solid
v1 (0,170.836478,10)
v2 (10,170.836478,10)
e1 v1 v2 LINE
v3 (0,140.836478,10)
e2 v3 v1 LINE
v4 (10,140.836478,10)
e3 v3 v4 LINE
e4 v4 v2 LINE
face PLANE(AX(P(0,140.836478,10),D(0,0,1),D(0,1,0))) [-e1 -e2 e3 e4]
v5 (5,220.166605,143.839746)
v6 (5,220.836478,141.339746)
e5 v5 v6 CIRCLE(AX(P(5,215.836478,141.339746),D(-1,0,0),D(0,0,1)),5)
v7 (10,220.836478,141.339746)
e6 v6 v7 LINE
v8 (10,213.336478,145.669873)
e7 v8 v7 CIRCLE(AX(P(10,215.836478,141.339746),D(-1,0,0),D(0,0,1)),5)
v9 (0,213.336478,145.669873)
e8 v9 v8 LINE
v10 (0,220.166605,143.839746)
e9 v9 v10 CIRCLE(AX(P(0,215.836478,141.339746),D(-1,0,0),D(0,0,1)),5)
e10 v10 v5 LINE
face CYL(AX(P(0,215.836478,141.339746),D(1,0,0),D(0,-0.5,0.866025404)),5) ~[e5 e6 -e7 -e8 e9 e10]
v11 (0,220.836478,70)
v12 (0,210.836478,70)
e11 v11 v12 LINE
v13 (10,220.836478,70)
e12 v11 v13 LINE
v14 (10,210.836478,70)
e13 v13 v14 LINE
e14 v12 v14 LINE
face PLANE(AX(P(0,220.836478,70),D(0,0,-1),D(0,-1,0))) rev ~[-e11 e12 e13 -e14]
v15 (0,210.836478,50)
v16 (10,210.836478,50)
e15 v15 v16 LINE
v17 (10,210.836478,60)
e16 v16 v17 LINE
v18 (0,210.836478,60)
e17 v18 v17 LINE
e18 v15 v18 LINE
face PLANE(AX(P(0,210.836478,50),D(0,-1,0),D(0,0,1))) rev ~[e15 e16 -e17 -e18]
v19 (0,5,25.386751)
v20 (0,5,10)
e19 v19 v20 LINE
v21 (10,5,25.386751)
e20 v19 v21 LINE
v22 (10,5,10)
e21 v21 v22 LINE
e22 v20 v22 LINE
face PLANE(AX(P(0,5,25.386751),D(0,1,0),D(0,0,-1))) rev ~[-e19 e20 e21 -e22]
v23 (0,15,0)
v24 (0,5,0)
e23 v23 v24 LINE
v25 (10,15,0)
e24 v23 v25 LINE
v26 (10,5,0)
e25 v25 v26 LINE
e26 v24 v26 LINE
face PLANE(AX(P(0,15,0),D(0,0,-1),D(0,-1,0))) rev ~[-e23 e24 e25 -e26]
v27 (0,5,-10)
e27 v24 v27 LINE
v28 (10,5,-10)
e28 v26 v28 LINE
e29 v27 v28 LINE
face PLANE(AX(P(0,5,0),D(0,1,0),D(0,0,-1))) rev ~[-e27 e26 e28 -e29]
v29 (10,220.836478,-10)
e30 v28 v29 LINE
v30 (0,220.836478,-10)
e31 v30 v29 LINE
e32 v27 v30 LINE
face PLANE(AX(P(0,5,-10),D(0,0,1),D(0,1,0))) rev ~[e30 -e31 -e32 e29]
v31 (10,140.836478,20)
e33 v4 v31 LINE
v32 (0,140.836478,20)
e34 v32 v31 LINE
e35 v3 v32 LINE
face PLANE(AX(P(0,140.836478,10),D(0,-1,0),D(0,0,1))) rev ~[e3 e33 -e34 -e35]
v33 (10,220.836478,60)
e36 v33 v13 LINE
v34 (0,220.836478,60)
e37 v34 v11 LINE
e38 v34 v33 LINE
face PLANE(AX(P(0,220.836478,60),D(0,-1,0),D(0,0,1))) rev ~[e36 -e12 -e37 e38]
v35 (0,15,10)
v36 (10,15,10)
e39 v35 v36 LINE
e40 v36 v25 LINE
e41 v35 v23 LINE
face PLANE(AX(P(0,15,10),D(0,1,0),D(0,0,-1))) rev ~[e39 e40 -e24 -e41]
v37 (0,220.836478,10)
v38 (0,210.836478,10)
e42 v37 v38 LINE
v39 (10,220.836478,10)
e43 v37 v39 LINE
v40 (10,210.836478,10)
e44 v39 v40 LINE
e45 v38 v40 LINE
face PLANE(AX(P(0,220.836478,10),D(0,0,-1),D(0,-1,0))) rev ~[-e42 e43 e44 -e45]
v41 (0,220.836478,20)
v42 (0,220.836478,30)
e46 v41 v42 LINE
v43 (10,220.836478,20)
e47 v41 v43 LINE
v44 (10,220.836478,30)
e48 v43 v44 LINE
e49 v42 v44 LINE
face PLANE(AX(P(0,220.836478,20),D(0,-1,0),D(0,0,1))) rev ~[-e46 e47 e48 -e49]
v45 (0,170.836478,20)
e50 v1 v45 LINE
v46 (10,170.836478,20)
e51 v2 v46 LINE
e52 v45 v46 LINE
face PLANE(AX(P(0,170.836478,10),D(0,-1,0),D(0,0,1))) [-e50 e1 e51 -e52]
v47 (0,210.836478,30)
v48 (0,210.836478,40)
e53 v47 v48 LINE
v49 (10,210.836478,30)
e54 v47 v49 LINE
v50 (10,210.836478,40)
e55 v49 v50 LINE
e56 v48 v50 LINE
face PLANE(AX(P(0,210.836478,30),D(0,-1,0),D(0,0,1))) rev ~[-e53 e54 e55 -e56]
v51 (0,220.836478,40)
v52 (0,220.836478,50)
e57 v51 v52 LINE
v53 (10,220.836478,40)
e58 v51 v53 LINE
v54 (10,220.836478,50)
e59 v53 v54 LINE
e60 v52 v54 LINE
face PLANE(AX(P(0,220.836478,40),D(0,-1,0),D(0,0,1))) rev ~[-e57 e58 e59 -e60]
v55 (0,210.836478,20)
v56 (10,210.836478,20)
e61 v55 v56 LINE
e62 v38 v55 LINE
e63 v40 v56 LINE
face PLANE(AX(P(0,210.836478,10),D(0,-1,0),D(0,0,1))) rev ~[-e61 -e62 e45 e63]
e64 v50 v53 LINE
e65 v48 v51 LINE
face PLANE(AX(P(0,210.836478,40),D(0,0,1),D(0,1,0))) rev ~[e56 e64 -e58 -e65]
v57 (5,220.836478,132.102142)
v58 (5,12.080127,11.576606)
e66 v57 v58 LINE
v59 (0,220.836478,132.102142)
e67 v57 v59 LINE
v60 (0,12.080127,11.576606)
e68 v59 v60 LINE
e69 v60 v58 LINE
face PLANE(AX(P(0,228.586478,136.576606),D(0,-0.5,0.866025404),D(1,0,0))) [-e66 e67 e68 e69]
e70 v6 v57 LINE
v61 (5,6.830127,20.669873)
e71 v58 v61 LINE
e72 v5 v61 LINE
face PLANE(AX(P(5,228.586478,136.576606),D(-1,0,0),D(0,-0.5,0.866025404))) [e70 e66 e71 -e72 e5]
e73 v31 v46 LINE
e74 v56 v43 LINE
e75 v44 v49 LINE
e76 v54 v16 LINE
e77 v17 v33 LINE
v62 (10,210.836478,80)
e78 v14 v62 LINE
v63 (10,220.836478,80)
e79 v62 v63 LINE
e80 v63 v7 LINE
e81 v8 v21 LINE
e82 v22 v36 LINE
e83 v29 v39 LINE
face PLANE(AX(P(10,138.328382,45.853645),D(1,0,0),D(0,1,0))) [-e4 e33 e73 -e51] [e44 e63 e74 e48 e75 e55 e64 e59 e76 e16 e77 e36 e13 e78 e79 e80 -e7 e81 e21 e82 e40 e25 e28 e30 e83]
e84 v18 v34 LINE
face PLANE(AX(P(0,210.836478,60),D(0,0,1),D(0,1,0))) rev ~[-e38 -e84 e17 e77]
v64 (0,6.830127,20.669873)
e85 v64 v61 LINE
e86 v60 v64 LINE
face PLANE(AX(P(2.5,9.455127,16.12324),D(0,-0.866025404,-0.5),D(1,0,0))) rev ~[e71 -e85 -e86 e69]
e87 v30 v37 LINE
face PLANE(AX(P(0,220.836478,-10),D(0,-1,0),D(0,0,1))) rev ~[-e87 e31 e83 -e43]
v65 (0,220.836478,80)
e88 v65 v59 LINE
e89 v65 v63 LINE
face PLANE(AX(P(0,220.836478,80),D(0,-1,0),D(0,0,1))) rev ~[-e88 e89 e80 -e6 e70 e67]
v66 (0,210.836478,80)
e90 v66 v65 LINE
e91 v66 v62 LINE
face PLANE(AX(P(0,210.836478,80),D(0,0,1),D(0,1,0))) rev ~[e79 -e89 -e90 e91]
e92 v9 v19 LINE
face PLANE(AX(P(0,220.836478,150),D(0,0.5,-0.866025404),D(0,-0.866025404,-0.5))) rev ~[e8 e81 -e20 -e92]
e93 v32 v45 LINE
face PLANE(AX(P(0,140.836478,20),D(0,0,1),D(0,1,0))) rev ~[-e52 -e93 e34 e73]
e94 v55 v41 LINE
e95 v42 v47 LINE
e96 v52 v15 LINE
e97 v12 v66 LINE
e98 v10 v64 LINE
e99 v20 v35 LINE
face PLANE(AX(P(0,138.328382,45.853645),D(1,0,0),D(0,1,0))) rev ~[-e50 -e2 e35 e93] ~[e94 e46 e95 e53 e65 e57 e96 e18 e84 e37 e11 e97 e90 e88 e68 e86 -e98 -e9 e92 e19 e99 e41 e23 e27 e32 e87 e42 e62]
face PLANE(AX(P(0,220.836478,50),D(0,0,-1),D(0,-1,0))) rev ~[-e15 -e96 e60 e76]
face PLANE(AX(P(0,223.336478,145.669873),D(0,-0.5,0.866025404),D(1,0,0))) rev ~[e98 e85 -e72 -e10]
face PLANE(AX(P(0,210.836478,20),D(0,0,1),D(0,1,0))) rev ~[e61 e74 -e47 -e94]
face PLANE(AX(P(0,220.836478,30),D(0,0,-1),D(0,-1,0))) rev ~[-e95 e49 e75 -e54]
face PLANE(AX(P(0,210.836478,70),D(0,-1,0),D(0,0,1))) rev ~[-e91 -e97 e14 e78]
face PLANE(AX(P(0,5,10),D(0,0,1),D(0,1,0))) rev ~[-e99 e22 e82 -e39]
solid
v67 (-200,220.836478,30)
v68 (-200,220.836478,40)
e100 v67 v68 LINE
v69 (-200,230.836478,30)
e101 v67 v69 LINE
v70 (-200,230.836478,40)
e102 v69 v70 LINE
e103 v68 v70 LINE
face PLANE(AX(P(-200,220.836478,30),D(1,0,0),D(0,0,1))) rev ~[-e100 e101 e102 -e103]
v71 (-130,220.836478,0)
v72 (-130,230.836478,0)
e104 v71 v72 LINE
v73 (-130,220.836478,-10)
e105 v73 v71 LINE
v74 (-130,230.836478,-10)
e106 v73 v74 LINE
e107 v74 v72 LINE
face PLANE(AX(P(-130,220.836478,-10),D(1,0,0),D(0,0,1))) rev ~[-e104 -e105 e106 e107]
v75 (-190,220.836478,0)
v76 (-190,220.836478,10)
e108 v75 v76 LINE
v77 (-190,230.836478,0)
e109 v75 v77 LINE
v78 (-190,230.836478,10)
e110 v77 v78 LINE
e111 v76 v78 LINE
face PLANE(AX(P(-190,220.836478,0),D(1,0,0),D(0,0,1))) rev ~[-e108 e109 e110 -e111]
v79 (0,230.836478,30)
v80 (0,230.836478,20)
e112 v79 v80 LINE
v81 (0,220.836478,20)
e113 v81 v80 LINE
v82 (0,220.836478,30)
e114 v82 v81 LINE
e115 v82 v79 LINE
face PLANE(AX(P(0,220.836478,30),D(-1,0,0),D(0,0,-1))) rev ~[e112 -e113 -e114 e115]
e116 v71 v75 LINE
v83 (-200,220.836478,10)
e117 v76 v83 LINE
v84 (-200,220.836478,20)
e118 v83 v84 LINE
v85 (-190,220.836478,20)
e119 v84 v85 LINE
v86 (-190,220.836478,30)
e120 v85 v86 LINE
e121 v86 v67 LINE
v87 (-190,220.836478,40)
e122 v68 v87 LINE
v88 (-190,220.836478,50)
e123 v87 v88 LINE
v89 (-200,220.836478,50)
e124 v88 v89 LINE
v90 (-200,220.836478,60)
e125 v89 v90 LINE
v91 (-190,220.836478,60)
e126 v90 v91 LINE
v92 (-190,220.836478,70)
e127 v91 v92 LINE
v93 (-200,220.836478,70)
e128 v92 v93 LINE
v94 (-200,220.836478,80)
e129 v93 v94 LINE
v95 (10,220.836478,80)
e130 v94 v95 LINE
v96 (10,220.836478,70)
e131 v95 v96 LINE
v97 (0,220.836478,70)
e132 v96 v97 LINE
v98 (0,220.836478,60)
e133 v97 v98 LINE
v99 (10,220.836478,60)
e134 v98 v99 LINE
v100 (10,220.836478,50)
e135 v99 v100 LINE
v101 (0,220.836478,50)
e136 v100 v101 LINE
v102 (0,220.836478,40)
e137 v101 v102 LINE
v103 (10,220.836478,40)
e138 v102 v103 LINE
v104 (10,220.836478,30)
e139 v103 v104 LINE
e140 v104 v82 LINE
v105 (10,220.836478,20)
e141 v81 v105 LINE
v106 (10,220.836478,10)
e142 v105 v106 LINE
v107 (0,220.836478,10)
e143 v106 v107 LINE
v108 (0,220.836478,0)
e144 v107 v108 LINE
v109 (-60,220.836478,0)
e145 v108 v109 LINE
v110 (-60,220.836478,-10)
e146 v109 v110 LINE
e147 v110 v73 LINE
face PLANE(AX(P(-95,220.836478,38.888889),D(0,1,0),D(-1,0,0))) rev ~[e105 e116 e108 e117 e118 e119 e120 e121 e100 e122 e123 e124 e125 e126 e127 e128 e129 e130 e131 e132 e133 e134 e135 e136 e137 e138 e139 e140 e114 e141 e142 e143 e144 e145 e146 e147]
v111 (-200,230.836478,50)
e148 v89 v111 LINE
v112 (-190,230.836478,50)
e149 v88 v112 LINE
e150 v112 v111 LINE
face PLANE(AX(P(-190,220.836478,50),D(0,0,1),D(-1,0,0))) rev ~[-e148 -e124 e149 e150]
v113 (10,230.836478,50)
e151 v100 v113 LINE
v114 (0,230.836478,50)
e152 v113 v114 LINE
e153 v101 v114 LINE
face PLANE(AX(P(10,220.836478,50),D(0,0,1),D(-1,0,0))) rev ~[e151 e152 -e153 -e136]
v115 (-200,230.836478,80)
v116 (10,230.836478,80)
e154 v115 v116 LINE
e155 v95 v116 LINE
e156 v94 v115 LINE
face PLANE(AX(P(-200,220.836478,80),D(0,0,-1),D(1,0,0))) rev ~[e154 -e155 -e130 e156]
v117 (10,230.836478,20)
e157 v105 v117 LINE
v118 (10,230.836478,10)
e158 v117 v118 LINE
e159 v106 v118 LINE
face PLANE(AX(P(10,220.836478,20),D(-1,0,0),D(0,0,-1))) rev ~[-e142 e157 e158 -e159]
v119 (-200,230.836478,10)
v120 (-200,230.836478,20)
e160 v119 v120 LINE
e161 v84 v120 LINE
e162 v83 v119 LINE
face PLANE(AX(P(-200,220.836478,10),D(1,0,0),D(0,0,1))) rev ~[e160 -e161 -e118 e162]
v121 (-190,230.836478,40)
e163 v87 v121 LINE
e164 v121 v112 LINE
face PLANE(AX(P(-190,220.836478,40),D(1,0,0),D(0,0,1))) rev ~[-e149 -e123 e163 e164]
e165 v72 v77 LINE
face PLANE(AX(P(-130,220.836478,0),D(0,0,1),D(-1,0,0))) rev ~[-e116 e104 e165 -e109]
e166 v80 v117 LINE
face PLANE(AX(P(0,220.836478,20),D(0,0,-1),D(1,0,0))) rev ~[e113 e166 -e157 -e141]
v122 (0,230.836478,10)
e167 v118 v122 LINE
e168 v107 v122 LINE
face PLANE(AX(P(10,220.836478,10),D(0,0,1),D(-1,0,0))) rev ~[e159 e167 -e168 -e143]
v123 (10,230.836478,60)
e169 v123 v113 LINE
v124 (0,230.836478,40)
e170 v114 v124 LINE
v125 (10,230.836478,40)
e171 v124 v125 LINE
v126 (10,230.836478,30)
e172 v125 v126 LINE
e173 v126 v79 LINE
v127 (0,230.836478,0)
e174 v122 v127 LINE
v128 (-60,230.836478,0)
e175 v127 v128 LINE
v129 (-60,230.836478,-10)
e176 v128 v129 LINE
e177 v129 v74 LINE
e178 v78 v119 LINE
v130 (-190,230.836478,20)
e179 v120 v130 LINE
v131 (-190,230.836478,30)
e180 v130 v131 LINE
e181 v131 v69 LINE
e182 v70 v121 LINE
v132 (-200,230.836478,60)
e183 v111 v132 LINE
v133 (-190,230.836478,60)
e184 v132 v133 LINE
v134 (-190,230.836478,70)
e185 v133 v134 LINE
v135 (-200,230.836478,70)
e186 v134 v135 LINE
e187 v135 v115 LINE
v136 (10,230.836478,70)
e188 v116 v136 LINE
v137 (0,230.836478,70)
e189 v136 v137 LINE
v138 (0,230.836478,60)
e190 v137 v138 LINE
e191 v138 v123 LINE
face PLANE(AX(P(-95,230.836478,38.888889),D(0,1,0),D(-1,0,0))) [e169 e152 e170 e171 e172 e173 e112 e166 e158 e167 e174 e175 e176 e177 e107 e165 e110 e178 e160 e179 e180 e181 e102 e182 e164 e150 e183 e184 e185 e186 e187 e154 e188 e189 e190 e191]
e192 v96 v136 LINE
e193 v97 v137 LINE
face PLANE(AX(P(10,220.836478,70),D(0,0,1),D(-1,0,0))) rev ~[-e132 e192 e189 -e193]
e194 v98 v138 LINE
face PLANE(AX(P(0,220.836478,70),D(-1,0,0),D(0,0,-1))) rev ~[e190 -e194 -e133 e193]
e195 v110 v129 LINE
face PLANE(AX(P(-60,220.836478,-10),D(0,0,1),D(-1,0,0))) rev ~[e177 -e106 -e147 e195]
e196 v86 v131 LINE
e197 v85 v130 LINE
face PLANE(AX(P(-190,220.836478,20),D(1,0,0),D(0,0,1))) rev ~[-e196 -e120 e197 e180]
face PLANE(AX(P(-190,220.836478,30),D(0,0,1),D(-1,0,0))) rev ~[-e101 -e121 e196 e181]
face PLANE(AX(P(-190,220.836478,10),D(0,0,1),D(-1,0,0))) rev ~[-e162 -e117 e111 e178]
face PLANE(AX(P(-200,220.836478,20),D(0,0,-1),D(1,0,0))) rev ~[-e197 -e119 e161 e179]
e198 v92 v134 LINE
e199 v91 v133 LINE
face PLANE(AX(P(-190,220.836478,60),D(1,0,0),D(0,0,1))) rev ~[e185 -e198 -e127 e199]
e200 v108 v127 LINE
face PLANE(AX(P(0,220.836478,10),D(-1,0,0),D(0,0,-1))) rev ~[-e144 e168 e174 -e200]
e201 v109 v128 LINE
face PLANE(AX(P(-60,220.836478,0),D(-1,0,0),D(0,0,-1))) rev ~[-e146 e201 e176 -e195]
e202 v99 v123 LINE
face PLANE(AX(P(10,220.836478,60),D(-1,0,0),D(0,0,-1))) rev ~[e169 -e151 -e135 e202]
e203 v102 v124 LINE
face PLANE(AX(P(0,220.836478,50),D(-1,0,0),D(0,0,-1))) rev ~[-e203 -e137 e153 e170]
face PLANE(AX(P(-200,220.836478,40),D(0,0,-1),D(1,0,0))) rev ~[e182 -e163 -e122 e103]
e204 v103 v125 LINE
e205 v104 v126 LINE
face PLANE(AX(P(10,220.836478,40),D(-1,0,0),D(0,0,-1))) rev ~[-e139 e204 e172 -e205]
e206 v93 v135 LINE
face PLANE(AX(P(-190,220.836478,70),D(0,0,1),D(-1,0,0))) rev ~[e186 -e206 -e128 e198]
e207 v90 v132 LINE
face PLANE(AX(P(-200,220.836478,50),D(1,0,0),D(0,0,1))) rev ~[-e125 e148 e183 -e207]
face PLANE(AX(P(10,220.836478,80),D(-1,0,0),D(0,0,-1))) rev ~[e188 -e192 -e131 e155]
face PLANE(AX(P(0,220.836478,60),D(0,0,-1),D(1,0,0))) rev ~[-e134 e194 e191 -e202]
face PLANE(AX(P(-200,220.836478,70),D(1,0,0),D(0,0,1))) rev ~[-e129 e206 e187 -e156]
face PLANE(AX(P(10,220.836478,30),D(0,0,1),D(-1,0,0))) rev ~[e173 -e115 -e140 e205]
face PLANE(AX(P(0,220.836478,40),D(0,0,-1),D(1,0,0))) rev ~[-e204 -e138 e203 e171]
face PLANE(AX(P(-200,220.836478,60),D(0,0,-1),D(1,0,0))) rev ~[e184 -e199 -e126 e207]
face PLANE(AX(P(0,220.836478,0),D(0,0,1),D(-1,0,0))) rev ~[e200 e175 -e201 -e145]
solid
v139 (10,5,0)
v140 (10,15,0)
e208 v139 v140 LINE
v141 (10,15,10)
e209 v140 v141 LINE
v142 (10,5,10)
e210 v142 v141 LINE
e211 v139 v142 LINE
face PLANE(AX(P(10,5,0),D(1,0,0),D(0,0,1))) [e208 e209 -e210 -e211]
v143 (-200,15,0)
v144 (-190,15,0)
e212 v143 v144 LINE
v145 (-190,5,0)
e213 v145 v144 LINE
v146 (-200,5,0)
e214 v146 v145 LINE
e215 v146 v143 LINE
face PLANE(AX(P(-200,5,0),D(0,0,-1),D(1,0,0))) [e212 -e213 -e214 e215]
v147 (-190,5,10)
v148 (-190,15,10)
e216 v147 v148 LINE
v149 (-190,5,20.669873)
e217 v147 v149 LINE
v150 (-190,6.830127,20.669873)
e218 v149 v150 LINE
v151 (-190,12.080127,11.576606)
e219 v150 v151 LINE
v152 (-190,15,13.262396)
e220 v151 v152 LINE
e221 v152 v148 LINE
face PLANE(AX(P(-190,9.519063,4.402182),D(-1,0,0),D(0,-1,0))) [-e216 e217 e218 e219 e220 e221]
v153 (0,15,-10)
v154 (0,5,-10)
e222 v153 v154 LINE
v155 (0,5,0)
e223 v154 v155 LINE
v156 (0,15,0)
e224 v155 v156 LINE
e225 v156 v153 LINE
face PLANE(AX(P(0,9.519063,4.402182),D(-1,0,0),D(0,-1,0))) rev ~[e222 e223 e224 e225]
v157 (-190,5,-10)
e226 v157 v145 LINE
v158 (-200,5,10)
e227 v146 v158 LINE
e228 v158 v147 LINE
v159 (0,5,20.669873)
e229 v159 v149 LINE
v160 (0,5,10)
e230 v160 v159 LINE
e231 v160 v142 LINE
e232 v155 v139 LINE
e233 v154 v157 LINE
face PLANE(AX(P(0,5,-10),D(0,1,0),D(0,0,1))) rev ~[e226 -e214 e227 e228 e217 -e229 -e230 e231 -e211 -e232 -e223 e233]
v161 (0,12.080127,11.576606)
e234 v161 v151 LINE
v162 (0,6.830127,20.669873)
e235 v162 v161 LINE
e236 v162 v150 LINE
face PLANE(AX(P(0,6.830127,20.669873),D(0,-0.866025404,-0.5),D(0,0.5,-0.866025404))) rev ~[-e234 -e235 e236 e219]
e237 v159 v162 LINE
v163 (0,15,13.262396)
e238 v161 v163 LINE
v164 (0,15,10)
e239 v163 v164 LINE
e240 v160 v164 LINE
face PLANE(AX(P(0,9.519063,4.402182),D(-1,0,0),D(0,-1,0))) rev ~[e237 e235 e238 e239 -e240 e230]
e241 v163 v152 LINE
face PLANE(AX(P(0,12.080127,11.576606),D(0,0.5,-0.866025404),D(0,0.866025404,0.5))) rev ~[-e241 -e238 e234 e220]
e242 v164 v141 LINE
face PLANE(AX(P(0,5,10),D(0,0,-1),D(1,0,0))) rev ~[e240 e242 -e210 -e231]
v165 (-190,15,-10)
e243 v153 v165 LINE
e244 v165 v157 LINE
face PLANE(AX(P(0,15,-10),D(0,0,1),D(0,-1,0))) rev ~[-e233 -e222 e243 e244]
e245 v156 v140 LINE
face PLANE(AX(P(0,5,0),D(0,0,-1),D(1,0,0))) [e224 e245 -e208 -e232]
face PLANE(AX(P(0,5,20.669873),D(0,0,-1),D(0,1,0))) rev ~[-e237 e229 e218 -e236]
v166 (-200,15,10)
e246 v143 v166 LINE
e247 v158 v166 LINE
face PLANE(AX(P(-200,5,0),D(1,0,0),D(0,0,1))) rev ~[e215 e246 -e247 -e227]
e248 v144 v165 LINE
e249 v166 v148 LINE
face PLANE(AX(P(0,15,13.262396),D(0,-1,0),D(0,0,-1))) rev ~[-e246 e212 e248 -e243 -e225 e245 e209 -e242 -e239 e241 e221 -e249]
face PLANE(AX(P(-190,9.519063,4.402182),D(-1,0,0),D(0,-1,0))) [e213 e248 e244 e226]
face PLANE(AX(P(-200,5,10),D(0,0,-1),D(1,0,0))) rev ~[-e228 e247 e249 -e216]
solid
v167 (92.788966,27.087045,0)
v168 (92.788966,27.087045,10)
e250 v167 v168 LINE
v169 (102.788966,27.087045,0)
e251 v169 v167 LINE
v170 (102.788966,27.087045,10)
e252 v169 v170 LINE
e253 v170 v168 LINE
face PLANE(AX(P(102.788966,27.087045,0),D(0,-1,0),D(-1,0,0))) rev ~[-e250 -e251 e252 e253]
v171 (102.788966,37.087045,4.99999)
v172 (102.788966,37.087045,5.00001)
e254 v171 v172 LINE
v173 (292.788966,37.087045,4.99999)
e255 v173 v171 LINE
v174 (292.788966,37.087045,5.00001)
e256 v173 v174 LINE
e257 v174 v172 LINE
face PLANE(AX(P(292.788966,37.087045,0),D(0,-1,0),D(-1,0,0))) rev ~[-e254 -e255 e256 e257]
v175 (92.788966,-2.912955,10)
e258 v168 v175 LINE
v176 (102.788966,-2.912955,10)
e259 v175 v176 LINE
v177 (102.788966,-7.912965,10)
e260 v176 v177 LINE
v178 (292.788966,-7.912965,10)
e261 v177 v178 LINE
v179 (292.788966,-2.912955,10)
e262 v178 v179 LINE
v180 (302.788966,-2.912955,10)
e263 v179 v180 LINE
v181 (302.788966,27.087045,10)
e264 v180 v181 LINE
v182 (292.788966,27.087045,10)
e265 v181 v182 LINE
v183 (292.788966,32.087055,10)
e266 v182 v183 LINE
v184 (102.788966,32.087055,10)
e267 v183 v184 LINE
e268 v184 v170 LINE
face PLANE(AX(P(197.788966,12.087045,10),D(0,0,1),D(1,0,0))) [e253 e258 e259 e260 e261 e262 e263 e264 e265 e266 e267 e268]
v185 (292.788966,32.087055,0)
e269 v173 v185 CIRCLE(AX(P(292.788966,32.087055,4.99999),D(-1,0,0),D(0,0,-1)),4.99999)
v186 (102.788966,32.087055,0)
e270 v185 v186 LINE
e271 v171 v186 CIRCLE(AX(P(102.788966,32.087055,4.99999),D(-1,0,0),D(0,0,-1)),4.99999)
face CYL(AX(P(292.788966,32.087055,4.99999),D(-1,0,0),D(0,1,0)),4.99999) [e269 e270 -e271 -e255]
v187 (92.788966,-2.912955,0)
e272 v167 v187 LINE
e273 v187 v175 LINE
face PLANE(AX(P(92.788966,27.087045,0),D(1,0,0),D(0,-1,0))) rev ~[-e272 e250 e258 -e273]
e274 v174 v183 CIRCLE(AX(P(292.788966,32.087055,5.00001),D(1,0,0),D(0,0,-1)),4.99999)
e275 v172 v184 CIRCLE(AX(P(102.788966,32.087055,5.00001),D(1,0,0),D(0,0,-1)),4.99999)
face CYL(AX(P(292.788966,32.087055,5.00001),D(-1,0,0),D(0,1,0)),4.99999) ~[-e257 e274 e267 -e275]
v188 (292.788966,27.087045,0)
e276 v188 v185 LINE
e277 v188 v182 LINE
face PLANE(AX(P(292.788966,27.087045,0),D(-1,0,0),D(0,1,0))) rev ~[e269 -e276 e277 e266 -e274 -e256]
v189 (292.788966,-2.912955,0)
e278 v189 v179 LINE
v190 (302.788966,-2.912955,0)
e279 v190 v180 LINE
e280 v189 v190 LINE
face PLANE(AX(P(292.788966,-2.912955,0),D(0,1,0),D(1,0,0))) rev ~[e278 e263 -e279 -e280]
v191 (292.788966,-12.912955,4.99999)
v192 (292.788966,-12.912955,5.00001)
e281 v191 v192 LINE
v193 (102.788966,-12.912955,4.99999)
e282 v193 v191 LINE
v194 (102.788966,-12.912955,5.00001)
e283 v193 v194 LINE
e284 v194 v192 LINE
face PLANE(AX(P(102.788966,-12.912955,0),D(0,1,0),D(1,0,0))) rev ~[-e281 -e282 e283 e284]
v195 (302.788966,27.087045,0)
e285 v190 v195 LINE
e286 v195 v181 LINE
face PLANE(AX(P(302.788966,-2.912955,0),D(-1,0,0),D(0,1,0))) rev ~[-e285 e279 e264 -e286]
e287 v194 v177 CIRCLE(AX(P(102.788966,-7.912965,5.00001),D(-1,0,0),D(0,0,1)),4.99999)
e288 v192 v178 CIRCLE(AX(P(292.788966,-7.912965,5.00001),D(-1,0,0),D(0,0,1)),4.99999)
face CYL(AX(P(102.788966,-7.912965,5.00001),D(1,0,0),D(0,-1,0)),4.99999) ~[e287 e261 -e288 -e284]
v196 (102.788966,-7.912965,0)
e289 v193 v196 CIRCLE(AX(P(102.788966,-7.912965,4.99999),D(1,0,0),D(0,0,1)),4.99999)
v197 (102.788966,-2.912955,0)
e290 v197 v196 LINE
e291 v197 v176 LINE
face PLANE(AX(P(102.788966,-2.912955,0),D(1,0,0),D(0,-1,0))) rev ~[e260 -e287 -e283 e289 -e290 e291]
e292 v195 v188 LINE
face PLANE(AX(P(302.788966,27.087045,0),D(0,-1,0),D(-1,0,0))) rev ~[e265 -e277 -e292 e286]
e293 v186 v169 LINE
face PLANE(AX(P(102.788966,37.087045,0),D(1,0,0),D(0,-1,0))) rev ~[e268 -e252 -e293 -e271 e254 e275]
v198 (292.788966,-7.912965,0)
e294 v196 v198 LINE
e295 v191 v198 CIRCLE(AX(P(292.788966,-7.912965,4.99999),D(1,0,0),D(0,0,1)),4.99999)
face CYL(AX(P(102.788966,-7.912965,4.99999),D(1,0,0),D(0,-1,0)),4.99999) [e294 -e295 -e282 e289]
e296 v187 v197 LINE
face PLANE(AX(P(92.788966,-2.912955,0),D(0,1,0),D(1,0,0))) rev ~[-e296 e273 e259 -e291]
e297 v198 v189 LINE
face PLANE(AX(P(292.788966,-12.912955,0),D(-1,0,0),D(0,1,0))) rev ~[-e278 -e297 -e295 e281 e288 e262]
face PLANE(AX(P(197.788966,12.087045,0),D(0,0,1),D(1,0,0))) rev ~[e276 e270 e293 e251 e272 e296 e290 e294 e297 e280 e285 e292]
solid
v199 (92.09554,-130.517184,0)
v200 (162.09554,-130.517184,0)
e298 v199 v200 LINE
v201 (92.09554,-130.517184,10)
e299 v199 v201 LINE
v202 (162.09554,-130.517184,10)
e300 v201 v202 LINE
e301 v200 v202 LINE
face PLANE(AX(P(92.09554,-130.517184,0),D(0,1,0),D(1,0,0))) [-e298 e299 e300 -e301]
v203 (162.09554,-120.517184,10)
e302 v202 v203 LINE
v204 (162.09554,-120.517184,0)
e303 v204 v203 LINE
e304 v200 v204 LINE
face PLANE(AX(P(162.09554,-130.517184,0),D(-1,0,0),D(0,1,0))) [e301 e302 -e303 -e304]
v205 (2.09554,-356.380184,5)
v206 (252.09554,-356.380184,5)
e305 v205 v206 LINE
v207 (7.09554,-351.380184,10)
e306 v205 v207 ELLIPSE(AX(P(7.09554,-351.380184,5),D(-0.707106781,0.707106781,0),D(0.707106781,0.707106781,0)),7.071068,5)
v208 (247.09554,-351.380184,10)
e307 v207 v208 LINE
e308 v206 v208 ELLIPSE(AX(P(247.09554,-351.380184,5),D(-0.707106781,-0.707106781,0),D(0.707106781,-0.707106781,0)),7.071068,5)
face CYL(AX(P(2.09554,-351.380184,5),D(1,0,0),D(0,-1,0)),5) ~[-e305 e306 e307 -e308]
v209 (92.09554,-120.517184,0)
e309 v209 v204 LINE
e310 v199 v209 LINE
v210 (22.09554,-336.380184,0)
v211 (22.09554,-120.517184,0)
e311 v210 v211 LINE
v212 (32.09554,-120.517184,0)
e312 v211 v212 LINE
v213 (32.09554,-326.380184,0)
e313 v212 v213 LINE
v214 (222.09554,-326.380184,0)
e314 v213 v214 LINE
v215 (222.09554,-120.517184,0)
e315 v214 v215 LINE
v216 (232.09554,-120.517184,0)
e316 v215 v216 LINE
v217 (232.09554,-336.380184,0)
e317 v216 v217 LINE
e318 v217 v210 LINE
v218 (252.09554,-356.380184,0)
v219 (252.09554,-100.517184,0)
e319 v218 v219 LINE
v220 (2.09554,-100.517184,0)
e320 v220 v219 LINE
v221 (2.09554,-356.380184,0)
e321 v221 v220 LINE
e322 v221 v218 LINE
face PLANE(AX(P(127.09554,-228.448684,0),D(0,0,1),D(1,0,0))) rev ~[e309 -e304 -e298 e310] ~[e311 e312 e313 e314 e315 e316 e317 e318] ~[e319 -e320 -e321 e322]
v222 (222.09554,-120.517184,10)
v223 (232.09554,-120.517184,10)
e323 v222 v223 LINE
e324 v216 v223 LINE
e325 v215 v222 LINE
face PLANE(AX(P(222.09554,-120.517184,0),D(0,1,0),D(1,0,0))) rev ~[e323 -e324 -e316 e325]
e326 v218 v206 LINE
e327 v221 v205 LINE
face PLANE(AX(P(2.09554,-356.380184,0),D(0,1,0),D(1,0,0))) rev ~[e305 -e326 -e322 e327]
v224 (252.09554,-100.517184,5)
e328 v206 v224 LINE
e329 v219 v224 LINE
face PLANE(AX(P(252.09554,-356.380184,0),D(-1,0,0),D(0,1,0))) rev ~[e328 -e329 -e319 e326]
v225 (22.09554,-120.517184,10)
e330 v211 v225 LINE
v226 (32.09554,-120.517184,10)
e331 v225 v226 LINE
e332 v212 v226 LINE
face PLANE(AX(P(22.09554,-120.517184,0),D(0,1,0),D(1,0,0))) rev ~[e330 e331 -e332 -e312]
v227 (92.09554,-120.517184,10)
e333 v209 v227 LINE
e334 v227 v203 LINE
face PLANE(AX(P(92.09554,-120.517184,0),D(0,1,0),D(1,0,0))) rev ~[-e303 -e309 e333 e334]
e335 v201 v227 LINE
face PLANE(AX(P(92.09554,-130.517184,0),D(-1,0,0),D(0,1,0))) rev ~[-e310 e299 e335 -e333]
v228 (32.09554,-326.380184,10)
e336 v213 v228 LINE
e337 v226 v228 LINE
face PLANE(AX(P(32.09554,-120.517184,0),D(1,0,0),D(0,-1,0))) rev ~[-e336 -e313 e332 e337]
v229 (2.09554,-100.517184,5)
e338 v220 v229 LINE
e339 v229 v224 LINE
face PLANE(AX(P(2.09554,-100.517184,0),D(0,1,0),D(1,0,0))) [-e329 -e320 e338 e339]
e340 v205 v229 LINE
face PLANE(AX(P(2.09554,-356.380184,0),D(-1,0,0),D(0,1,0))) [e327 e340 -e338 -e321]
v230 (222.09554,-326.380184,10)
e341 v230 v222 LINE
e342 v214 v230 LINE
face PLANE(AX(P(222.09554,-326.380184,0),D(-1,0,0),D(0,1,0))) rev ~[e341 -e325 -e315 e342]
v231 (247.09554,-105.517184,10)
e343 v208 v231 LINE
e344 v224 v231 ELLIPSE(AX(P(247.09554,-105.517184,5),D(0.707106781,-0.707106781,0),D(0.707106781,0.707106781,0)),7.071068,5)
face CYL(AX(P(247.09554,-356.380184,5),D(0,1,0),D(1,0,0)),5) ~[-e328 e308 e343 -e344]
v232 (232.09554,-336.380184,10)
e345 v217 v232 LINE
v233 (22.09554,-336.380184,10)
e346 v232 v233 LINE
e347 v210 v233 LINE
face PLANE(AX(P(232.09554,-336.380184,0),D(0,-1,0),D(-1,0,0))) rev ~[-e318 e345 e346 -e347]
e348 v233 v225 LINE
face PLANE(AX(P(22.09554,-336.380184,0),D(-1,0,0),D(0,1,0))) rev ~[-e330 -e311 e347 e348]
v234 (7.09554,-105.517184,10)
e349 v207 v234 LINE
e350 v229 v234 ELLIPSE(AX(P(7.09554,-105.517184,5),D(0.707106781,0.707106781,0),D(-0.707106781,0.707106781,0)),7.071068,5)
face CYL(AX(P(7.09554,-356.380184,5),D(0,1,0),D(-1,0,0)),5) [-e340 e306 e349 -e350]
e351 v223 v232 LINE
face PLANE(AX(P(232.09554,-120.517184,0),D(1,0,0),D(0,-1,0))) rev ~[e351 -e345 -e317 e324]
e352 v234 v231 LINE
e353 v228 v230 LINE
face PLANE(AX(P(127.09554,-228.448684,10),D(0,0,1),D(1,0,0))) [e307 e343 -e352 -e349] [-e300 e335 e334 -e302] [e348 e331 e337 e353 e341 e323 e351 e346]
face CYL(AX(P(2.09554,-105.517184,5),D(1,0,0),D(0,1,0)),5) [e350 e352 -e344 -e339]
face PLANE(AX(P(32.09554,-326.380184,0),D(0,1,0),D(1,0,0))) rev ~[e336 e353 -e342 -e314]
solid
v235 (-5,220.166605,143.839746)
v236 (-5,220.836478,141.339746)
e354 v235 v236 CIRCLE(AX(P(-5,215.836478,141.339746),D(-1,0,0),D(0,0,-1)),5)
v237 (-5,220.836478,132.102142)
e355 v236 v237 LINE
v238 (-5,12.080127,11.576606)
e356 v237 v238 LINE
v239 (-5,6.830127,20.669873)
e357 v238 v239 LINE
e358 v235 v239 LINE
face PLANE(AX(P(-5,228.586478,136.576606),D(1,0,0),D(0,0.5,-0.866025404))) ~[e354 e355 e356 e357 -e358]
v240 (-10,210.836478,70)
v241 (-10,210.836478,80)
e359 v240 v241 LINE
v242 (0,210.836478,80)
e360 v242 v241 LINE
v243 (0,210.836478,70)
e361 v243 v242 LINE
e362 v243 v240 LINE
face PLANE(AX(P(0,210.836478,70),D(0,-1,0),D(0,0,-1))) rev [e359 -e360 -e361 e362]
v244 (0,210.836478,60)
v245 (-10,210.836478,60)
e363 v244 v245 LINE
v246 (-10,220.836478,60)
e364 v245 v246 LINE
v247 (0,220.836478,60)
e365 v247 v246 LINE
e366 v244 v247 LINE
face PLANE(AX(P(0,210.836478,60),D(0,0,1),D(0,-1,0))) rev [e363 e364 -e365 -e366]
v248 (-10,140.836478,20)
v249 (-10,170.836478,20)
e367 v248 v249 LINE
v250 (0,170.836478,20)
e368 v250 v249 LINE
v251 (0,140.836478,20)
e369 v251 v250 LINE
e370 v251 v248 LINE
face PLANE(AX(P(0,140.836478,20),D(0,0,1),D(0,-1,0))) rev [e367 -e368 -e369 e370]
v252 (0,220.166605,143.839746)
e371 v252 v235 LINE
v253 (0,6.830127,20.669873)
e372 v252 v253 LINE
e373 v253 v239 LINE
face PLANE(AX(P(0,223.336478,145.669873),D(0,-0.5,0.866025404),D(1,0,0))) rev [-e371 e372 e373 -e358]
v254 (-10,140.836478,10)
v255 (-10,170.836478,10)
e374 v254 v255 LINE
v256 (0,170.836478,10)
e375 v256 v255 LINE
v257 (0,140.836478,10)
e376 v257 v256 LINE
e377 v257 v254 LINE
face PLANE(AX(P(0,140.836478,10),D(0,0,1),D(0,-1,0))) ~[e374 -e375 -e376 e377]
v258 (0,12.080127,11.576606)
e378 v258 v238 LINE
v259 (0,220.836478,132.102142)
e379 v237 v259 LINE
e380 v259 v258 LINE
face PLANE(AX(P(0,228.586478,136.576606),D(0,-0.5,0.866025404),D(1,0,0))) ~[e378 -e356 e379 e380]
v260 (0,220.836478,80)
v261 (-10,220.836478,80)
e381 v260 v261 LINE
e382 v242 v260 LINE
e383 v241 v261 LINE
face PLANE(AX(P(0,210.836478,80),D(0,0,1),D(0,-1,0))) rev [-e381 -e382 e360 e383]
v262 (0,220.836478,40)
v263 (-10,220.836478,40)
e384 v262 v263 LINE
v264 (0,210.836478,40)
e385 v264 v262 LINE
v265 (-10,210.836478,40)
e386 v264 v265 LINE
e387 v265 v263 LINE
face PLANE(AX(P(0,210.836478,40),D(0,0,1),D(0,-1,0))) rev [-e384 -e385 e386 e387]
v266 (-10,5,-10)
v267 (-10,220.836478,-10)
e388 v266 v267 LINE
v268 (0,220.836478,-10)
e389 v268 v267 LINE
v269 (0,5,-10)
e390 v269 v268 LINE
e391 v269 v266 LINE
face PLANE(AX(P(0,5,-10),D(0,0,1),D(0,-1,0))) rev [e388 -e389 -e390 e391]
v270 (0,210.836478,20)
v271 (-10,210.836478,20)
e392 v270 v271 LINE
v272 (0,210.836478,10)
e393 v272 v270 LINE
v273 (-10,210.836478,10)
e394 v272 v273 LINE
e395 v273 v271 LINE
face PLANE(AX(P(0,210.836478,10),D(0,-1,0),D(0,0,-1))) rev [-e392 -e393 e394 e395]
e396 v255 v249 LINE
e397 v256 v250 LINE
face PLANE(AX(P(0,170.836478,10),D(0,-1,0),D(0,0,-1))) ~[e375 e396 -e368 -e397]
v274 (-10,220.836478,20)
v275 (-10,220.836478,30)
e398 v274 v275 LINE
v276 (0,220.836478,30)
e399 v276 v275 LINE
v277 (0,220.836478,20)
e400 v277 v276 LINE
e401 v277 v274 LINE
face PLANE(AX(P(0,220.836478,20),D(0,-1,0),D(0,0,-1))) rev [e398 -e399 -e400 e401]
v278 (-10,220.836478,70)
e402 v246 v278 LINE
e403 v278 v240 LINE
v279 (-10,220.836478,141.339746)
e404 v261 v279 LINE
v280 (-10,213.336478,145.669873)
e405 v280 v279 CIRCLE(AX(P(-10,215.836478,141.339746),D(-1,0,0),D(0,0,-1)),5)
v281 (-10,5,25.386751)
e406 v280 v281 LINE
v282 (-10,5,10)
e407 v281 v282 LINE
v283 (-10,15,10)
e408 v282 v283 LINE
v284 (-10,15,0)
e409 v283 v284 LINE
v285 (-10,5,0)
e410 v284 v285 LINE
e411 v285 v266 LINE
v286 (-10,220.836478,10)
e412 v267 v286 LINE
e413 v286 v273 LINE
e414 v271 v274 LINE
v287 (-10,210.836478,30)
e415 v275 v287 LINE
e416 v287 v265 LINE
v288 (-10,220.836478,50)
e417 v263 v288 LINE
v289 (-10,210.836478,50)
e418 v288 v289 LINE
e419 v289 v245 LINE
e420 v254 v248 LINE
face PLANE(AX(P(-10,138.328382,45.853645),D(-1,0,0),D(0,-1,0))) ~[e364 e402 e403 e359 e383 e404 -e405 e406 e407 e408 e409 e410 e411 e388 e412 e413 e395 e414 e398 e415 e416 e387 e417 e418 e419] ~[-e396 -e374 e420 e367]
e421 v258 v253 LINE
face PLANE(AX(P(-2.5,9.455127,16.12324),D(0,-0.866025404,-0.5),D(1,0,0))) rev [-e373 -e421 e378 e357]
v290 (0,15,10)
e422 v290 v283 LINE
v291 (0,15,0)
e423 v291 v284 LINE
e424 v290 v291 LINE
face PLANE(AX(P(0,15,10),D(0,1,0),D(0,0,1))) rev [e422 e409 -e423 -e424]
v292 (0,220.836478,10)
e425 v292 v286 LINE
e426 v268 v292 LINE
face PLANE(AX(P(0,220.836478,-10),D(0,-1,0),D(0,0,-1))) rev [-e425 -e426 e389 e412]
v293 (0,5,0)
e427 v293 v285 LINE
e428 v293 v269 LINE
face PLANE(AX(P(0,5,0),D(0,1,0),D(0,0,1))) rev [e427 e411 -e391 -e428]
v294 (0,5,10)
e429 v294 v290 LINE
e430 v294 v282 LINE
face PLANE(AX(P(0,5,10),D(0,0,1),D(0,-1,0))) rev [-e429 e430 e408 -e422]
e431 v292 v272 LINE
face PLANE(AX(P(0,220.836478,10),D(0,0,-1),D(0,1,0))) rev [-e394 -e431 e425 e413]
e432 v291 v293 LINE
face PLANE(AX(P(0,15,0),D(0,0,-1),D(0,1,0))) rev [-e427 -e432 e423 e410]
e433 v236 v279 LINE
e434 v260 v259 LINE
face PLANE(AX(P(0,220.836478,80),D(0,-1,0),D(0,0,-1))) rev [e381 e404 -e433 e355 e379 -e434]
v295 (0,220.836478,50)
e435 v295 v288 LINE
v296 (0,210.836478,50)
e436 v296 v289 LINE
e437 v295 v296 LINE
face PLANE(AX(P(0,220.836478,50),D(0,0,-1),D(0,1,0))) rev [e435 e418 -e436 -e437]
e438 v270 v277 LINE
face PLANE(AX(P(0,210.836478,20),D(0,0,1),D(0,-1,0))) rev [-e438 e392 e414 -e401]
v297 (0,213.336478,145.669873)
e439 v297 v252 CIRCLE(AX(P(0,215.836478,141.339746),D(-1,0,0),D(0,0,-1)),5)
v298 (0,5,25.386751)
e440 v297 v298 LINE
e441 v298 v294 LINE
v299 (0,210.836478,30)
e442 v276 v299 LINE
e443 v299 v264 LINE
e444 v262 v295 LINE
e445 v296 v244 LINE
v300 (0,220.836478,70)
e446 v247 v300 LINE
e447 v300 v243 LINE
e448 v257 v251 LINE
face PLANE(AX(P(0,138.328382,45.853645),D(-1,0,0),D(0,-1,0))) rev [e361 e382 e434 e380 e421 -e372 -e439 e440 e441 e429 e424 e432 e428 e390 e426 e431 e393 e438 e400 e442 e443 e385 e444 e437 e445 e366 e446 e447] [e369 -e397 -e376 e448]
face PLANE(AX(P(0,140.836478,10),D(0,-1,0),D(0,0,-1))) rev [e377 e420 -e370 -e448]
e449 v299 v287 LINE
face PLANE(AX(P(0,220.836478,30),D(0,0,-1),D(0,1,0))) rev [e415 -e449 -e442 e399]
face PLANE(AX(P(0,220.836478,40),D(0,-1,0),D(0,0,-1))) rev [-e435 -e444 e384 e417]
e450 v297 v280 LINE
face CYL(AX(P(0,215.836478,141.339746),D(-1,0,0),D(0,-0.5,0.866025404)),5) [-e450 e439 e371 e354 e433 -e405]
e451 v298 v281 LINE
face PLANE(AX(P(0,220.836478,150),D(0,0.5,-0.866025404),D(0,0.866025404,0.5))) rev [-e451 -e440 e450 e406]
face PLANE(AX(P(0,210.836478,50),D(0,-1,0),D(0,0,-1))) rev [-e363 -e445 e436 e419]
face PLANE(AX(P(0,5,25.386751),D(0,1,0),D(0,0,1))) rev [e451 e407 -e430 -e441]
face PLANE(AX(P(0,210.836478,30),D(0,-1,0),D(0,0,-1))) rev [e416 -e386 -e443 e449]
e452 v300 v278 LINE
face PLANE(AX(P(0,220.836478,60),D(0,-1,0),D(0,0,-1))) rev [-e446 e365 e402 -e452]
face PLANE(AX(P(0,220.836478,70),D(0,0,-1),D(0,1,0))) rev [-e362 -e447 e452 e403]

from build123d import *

# Parameters (mm, degrees)
F0_W      = 30
F0_H      = 10
F1_DEPTH  = 10
F3_W      = 5
F3_H      = 10.5
F4_DEPTH  = 250
F6_W      = 250
F6_H      = 255.863
F6_W_2    = 70
F6_H_2    = 10
F7_DEPTH  = 10
F9_DEPTH  = 190
F10_W     = 10
F10_H     = 10
F11_DEPTH = 10
F13_DEPTH = 10
F15_DEPTH = 10
F16_R     = 5
F16_2_R   = 5
F17_R     = 5
F18_R     = 4.99999


# Not quite as in the source:
# - a fillet or chamfer is up to 0.001 mm smaller than in the source, because OpenCascade refuses the exact size


with BuildPart() as f1:
    # F0 (on Right) → F1 (new body)
    with BuildSketch(Plane.YZ):
        Polygon((220.836477965, 150), (5, 25.3867513459), (5, 10), (15, 10), (15, 0), (5, 0), (5, -10), (220.836477965, -10), (220.836477965, 0), (220.836477965, 10), (210.836477965, 10), (210.836477965, 20), (220.836477965, 20), (220.836477965, 30), (210.836477965, 30), (210.836477965, 40), (220.836477965, 40), (220.836477965, 50), (210.836477965, 50), (210.836477965, 60), (220.836477965, 60), (220.836477965, 70), (210.836477965, 70), (210.836477965, 80), (220.836477965, 80), align=None)
        with Locations((155.836477965, 15)):
            Rectangle(F0_W, F0_H, mode=Mode.SUBTRACT)
    extrude(amount=F1_DEPTH)

    # F3 (on face) → F4 (cut)
    with BuildSketch(Plane(origin=(0, 230.5792637576, 133.125), x_dir=(1, 0, 0), z_dir=(0, -0.8660254038, -0.5))):
        with Locations((2.5, 9.2355715851)):
            Rectangle(F3_W, F3_H)
    extrude(amount=F4_DEPTH, mode=Mode.SUBTRACT)


with BuildPart() as f5_1:
    # F5: instance of F1
    add(f1.part.mirror(Plane.YZ))

    # F16#2
    f16_2_edges = [f5_1.edges().sort_by_distance(p)[0] for p in [
        (-5, 220.836478, 150),
    ]]
    fillet(f16_2_edges, radius=F16_2_R)


with BuildPart() as f7:
    # F6 (on Top) → F7 (new body)
    with BuildSketch(Plane.XY):
        with Locations((127.095540093, -228.4486843696)):
            Rectangle(F6_W, F6_H)
        Polygon((222.095540093, -120.5171843696), (232.095540093, -120.5171843696), (232.095540093, -336.3801843696), (222.992540093, -336.3801843696), (31.232540093, -336.3801843696), (22.095540093, -336.3801843696), (22.095540093, -120.5171843696), (32.095540093, -120.5171843696), (32.095540093, -326.3801843696), (222.095540093, -326.3801843696), align=None, mode=Mode.SUBTRACT)
        with Locations((127.095540093, -125.5171843696)):
            Rectangle(F6_W_2, F6_H_2, mode=Mode.SUBTRACT)
    extrude(amount=F7_DEPTH)

    # F17
    f17_edges = [f7.edges().sort_by_distance(p)[0] for p in [
        (2.09554, -228.448684, 10),
        (127.09554, -356.380184, 10),
        (252.09554, -228.448684, 10),
        (127.09554, -100.517184, 10),
    ]]
    fillet(f17_edges, radius=F17_R)


with BuildPart() as f9:
    # F8 (on face) → F9 (new body)
    with BuildSketch(Plane(origin=(0, 0, 0), x_dir=(0, -1, 0), z_dir=(-1, 0, 0))):
        Polygon((-15, -10), (-5, -10), (-5, 20.6698729811), (-6.8301270189, 20.6698729811), (-12.0801270189, 11.5766062413), (-15, 13.262395693), align=None)
    extrude(amount=F9_DEPTH)

    # F10 (on face) → F11 (join)
    with BuildSketch(Plane.XZ.offset(-5)):
        with Locations((5, 5)):
            Rectangle(F10_W, F10_H)
        with Locations((-195, 5)):
            Rectangle(F10_W, F10_H)
    extrude(amount=-F11_DEPTH)


with BuildPart() as f13:
    # F12 (on face) → F13 (new body)
    with BuildSketch(Plane(origin=(0, 220.836477965, 0), x_dir=(-1, 0, 0), z_dir=(0, 1, 0))):
        Polygon((0, 10), (0, 0), (60, 0), (60, -10), (95, -10), (130, -10), (130, 0), (190, 0), (190, 10), (200, 10), (200, 20), (190, 20), (190, 30), (200, 30), (200, 40), (190, 40), (190, 50), (200, 50), (200, 60), (190, 60), (190, 70), (200, 70), (200, 80), (95, 80), (-10, 80), (-10, 70), (0, 70), (0, 60), (-10, 60), (-10, 50), (0, 50), (0, 40), (-10, 40), (-10, 30), (0, 30), (0, 20), (-10, 20), (-10, 10), align=None)
    extrude(amount=F13_DEPTH)


with BuildPart() as f15:
    # F14 (on Top) → F15 (new body)
    with BuildSketch(Plane.XY):
        Polygon((292.7889656446, 37.0870450573), (102.7889656446, 37.0870450573), (102.7889656446, 27.0870450573), (92.7889656446, 27.0870450573), (92.7889656446, -2.9129549427), (102.7889656446, -2.9129549427), (102.7889656446, -12.9129549427), (292.7889656446, -12.9129549427), (292.7889656446, -2.9129549427), (302.7889656446, -2.9129549427), (302.7889656446, 27.0870450573), (292.7889656446, 27.0870450573), align=None)
    extrude(amount=F15_DEPTH)

    # F18 (radius 5 in the source; OpenCascade refuses exactly that, so slightly less here)
    f18_edges = [f15.edges().sort_by_distance(p)[0] for p in [
        (197.788966, 37.087045, 10),
        (197.788966, 37.087045, 0),
        (197.788966, -12.912955, 10),
        (197.788966, -12.912955, 0),
    ]]
    fillet(f18_edges, radius=F18_R)


with BuildPart() as f1_1:
    add(f1.part)

    # F16
    f16_edges = [f1_1.edges().sort_by_distance(p)[0] for p in [
        (5, 220.836478, 150),
    ]]
    fillet(f16_edges, radius=F16_R)


solid = Compound([f5_1.part, f7.part, f9.part, f13.part, f15.part, f1_1.part])
